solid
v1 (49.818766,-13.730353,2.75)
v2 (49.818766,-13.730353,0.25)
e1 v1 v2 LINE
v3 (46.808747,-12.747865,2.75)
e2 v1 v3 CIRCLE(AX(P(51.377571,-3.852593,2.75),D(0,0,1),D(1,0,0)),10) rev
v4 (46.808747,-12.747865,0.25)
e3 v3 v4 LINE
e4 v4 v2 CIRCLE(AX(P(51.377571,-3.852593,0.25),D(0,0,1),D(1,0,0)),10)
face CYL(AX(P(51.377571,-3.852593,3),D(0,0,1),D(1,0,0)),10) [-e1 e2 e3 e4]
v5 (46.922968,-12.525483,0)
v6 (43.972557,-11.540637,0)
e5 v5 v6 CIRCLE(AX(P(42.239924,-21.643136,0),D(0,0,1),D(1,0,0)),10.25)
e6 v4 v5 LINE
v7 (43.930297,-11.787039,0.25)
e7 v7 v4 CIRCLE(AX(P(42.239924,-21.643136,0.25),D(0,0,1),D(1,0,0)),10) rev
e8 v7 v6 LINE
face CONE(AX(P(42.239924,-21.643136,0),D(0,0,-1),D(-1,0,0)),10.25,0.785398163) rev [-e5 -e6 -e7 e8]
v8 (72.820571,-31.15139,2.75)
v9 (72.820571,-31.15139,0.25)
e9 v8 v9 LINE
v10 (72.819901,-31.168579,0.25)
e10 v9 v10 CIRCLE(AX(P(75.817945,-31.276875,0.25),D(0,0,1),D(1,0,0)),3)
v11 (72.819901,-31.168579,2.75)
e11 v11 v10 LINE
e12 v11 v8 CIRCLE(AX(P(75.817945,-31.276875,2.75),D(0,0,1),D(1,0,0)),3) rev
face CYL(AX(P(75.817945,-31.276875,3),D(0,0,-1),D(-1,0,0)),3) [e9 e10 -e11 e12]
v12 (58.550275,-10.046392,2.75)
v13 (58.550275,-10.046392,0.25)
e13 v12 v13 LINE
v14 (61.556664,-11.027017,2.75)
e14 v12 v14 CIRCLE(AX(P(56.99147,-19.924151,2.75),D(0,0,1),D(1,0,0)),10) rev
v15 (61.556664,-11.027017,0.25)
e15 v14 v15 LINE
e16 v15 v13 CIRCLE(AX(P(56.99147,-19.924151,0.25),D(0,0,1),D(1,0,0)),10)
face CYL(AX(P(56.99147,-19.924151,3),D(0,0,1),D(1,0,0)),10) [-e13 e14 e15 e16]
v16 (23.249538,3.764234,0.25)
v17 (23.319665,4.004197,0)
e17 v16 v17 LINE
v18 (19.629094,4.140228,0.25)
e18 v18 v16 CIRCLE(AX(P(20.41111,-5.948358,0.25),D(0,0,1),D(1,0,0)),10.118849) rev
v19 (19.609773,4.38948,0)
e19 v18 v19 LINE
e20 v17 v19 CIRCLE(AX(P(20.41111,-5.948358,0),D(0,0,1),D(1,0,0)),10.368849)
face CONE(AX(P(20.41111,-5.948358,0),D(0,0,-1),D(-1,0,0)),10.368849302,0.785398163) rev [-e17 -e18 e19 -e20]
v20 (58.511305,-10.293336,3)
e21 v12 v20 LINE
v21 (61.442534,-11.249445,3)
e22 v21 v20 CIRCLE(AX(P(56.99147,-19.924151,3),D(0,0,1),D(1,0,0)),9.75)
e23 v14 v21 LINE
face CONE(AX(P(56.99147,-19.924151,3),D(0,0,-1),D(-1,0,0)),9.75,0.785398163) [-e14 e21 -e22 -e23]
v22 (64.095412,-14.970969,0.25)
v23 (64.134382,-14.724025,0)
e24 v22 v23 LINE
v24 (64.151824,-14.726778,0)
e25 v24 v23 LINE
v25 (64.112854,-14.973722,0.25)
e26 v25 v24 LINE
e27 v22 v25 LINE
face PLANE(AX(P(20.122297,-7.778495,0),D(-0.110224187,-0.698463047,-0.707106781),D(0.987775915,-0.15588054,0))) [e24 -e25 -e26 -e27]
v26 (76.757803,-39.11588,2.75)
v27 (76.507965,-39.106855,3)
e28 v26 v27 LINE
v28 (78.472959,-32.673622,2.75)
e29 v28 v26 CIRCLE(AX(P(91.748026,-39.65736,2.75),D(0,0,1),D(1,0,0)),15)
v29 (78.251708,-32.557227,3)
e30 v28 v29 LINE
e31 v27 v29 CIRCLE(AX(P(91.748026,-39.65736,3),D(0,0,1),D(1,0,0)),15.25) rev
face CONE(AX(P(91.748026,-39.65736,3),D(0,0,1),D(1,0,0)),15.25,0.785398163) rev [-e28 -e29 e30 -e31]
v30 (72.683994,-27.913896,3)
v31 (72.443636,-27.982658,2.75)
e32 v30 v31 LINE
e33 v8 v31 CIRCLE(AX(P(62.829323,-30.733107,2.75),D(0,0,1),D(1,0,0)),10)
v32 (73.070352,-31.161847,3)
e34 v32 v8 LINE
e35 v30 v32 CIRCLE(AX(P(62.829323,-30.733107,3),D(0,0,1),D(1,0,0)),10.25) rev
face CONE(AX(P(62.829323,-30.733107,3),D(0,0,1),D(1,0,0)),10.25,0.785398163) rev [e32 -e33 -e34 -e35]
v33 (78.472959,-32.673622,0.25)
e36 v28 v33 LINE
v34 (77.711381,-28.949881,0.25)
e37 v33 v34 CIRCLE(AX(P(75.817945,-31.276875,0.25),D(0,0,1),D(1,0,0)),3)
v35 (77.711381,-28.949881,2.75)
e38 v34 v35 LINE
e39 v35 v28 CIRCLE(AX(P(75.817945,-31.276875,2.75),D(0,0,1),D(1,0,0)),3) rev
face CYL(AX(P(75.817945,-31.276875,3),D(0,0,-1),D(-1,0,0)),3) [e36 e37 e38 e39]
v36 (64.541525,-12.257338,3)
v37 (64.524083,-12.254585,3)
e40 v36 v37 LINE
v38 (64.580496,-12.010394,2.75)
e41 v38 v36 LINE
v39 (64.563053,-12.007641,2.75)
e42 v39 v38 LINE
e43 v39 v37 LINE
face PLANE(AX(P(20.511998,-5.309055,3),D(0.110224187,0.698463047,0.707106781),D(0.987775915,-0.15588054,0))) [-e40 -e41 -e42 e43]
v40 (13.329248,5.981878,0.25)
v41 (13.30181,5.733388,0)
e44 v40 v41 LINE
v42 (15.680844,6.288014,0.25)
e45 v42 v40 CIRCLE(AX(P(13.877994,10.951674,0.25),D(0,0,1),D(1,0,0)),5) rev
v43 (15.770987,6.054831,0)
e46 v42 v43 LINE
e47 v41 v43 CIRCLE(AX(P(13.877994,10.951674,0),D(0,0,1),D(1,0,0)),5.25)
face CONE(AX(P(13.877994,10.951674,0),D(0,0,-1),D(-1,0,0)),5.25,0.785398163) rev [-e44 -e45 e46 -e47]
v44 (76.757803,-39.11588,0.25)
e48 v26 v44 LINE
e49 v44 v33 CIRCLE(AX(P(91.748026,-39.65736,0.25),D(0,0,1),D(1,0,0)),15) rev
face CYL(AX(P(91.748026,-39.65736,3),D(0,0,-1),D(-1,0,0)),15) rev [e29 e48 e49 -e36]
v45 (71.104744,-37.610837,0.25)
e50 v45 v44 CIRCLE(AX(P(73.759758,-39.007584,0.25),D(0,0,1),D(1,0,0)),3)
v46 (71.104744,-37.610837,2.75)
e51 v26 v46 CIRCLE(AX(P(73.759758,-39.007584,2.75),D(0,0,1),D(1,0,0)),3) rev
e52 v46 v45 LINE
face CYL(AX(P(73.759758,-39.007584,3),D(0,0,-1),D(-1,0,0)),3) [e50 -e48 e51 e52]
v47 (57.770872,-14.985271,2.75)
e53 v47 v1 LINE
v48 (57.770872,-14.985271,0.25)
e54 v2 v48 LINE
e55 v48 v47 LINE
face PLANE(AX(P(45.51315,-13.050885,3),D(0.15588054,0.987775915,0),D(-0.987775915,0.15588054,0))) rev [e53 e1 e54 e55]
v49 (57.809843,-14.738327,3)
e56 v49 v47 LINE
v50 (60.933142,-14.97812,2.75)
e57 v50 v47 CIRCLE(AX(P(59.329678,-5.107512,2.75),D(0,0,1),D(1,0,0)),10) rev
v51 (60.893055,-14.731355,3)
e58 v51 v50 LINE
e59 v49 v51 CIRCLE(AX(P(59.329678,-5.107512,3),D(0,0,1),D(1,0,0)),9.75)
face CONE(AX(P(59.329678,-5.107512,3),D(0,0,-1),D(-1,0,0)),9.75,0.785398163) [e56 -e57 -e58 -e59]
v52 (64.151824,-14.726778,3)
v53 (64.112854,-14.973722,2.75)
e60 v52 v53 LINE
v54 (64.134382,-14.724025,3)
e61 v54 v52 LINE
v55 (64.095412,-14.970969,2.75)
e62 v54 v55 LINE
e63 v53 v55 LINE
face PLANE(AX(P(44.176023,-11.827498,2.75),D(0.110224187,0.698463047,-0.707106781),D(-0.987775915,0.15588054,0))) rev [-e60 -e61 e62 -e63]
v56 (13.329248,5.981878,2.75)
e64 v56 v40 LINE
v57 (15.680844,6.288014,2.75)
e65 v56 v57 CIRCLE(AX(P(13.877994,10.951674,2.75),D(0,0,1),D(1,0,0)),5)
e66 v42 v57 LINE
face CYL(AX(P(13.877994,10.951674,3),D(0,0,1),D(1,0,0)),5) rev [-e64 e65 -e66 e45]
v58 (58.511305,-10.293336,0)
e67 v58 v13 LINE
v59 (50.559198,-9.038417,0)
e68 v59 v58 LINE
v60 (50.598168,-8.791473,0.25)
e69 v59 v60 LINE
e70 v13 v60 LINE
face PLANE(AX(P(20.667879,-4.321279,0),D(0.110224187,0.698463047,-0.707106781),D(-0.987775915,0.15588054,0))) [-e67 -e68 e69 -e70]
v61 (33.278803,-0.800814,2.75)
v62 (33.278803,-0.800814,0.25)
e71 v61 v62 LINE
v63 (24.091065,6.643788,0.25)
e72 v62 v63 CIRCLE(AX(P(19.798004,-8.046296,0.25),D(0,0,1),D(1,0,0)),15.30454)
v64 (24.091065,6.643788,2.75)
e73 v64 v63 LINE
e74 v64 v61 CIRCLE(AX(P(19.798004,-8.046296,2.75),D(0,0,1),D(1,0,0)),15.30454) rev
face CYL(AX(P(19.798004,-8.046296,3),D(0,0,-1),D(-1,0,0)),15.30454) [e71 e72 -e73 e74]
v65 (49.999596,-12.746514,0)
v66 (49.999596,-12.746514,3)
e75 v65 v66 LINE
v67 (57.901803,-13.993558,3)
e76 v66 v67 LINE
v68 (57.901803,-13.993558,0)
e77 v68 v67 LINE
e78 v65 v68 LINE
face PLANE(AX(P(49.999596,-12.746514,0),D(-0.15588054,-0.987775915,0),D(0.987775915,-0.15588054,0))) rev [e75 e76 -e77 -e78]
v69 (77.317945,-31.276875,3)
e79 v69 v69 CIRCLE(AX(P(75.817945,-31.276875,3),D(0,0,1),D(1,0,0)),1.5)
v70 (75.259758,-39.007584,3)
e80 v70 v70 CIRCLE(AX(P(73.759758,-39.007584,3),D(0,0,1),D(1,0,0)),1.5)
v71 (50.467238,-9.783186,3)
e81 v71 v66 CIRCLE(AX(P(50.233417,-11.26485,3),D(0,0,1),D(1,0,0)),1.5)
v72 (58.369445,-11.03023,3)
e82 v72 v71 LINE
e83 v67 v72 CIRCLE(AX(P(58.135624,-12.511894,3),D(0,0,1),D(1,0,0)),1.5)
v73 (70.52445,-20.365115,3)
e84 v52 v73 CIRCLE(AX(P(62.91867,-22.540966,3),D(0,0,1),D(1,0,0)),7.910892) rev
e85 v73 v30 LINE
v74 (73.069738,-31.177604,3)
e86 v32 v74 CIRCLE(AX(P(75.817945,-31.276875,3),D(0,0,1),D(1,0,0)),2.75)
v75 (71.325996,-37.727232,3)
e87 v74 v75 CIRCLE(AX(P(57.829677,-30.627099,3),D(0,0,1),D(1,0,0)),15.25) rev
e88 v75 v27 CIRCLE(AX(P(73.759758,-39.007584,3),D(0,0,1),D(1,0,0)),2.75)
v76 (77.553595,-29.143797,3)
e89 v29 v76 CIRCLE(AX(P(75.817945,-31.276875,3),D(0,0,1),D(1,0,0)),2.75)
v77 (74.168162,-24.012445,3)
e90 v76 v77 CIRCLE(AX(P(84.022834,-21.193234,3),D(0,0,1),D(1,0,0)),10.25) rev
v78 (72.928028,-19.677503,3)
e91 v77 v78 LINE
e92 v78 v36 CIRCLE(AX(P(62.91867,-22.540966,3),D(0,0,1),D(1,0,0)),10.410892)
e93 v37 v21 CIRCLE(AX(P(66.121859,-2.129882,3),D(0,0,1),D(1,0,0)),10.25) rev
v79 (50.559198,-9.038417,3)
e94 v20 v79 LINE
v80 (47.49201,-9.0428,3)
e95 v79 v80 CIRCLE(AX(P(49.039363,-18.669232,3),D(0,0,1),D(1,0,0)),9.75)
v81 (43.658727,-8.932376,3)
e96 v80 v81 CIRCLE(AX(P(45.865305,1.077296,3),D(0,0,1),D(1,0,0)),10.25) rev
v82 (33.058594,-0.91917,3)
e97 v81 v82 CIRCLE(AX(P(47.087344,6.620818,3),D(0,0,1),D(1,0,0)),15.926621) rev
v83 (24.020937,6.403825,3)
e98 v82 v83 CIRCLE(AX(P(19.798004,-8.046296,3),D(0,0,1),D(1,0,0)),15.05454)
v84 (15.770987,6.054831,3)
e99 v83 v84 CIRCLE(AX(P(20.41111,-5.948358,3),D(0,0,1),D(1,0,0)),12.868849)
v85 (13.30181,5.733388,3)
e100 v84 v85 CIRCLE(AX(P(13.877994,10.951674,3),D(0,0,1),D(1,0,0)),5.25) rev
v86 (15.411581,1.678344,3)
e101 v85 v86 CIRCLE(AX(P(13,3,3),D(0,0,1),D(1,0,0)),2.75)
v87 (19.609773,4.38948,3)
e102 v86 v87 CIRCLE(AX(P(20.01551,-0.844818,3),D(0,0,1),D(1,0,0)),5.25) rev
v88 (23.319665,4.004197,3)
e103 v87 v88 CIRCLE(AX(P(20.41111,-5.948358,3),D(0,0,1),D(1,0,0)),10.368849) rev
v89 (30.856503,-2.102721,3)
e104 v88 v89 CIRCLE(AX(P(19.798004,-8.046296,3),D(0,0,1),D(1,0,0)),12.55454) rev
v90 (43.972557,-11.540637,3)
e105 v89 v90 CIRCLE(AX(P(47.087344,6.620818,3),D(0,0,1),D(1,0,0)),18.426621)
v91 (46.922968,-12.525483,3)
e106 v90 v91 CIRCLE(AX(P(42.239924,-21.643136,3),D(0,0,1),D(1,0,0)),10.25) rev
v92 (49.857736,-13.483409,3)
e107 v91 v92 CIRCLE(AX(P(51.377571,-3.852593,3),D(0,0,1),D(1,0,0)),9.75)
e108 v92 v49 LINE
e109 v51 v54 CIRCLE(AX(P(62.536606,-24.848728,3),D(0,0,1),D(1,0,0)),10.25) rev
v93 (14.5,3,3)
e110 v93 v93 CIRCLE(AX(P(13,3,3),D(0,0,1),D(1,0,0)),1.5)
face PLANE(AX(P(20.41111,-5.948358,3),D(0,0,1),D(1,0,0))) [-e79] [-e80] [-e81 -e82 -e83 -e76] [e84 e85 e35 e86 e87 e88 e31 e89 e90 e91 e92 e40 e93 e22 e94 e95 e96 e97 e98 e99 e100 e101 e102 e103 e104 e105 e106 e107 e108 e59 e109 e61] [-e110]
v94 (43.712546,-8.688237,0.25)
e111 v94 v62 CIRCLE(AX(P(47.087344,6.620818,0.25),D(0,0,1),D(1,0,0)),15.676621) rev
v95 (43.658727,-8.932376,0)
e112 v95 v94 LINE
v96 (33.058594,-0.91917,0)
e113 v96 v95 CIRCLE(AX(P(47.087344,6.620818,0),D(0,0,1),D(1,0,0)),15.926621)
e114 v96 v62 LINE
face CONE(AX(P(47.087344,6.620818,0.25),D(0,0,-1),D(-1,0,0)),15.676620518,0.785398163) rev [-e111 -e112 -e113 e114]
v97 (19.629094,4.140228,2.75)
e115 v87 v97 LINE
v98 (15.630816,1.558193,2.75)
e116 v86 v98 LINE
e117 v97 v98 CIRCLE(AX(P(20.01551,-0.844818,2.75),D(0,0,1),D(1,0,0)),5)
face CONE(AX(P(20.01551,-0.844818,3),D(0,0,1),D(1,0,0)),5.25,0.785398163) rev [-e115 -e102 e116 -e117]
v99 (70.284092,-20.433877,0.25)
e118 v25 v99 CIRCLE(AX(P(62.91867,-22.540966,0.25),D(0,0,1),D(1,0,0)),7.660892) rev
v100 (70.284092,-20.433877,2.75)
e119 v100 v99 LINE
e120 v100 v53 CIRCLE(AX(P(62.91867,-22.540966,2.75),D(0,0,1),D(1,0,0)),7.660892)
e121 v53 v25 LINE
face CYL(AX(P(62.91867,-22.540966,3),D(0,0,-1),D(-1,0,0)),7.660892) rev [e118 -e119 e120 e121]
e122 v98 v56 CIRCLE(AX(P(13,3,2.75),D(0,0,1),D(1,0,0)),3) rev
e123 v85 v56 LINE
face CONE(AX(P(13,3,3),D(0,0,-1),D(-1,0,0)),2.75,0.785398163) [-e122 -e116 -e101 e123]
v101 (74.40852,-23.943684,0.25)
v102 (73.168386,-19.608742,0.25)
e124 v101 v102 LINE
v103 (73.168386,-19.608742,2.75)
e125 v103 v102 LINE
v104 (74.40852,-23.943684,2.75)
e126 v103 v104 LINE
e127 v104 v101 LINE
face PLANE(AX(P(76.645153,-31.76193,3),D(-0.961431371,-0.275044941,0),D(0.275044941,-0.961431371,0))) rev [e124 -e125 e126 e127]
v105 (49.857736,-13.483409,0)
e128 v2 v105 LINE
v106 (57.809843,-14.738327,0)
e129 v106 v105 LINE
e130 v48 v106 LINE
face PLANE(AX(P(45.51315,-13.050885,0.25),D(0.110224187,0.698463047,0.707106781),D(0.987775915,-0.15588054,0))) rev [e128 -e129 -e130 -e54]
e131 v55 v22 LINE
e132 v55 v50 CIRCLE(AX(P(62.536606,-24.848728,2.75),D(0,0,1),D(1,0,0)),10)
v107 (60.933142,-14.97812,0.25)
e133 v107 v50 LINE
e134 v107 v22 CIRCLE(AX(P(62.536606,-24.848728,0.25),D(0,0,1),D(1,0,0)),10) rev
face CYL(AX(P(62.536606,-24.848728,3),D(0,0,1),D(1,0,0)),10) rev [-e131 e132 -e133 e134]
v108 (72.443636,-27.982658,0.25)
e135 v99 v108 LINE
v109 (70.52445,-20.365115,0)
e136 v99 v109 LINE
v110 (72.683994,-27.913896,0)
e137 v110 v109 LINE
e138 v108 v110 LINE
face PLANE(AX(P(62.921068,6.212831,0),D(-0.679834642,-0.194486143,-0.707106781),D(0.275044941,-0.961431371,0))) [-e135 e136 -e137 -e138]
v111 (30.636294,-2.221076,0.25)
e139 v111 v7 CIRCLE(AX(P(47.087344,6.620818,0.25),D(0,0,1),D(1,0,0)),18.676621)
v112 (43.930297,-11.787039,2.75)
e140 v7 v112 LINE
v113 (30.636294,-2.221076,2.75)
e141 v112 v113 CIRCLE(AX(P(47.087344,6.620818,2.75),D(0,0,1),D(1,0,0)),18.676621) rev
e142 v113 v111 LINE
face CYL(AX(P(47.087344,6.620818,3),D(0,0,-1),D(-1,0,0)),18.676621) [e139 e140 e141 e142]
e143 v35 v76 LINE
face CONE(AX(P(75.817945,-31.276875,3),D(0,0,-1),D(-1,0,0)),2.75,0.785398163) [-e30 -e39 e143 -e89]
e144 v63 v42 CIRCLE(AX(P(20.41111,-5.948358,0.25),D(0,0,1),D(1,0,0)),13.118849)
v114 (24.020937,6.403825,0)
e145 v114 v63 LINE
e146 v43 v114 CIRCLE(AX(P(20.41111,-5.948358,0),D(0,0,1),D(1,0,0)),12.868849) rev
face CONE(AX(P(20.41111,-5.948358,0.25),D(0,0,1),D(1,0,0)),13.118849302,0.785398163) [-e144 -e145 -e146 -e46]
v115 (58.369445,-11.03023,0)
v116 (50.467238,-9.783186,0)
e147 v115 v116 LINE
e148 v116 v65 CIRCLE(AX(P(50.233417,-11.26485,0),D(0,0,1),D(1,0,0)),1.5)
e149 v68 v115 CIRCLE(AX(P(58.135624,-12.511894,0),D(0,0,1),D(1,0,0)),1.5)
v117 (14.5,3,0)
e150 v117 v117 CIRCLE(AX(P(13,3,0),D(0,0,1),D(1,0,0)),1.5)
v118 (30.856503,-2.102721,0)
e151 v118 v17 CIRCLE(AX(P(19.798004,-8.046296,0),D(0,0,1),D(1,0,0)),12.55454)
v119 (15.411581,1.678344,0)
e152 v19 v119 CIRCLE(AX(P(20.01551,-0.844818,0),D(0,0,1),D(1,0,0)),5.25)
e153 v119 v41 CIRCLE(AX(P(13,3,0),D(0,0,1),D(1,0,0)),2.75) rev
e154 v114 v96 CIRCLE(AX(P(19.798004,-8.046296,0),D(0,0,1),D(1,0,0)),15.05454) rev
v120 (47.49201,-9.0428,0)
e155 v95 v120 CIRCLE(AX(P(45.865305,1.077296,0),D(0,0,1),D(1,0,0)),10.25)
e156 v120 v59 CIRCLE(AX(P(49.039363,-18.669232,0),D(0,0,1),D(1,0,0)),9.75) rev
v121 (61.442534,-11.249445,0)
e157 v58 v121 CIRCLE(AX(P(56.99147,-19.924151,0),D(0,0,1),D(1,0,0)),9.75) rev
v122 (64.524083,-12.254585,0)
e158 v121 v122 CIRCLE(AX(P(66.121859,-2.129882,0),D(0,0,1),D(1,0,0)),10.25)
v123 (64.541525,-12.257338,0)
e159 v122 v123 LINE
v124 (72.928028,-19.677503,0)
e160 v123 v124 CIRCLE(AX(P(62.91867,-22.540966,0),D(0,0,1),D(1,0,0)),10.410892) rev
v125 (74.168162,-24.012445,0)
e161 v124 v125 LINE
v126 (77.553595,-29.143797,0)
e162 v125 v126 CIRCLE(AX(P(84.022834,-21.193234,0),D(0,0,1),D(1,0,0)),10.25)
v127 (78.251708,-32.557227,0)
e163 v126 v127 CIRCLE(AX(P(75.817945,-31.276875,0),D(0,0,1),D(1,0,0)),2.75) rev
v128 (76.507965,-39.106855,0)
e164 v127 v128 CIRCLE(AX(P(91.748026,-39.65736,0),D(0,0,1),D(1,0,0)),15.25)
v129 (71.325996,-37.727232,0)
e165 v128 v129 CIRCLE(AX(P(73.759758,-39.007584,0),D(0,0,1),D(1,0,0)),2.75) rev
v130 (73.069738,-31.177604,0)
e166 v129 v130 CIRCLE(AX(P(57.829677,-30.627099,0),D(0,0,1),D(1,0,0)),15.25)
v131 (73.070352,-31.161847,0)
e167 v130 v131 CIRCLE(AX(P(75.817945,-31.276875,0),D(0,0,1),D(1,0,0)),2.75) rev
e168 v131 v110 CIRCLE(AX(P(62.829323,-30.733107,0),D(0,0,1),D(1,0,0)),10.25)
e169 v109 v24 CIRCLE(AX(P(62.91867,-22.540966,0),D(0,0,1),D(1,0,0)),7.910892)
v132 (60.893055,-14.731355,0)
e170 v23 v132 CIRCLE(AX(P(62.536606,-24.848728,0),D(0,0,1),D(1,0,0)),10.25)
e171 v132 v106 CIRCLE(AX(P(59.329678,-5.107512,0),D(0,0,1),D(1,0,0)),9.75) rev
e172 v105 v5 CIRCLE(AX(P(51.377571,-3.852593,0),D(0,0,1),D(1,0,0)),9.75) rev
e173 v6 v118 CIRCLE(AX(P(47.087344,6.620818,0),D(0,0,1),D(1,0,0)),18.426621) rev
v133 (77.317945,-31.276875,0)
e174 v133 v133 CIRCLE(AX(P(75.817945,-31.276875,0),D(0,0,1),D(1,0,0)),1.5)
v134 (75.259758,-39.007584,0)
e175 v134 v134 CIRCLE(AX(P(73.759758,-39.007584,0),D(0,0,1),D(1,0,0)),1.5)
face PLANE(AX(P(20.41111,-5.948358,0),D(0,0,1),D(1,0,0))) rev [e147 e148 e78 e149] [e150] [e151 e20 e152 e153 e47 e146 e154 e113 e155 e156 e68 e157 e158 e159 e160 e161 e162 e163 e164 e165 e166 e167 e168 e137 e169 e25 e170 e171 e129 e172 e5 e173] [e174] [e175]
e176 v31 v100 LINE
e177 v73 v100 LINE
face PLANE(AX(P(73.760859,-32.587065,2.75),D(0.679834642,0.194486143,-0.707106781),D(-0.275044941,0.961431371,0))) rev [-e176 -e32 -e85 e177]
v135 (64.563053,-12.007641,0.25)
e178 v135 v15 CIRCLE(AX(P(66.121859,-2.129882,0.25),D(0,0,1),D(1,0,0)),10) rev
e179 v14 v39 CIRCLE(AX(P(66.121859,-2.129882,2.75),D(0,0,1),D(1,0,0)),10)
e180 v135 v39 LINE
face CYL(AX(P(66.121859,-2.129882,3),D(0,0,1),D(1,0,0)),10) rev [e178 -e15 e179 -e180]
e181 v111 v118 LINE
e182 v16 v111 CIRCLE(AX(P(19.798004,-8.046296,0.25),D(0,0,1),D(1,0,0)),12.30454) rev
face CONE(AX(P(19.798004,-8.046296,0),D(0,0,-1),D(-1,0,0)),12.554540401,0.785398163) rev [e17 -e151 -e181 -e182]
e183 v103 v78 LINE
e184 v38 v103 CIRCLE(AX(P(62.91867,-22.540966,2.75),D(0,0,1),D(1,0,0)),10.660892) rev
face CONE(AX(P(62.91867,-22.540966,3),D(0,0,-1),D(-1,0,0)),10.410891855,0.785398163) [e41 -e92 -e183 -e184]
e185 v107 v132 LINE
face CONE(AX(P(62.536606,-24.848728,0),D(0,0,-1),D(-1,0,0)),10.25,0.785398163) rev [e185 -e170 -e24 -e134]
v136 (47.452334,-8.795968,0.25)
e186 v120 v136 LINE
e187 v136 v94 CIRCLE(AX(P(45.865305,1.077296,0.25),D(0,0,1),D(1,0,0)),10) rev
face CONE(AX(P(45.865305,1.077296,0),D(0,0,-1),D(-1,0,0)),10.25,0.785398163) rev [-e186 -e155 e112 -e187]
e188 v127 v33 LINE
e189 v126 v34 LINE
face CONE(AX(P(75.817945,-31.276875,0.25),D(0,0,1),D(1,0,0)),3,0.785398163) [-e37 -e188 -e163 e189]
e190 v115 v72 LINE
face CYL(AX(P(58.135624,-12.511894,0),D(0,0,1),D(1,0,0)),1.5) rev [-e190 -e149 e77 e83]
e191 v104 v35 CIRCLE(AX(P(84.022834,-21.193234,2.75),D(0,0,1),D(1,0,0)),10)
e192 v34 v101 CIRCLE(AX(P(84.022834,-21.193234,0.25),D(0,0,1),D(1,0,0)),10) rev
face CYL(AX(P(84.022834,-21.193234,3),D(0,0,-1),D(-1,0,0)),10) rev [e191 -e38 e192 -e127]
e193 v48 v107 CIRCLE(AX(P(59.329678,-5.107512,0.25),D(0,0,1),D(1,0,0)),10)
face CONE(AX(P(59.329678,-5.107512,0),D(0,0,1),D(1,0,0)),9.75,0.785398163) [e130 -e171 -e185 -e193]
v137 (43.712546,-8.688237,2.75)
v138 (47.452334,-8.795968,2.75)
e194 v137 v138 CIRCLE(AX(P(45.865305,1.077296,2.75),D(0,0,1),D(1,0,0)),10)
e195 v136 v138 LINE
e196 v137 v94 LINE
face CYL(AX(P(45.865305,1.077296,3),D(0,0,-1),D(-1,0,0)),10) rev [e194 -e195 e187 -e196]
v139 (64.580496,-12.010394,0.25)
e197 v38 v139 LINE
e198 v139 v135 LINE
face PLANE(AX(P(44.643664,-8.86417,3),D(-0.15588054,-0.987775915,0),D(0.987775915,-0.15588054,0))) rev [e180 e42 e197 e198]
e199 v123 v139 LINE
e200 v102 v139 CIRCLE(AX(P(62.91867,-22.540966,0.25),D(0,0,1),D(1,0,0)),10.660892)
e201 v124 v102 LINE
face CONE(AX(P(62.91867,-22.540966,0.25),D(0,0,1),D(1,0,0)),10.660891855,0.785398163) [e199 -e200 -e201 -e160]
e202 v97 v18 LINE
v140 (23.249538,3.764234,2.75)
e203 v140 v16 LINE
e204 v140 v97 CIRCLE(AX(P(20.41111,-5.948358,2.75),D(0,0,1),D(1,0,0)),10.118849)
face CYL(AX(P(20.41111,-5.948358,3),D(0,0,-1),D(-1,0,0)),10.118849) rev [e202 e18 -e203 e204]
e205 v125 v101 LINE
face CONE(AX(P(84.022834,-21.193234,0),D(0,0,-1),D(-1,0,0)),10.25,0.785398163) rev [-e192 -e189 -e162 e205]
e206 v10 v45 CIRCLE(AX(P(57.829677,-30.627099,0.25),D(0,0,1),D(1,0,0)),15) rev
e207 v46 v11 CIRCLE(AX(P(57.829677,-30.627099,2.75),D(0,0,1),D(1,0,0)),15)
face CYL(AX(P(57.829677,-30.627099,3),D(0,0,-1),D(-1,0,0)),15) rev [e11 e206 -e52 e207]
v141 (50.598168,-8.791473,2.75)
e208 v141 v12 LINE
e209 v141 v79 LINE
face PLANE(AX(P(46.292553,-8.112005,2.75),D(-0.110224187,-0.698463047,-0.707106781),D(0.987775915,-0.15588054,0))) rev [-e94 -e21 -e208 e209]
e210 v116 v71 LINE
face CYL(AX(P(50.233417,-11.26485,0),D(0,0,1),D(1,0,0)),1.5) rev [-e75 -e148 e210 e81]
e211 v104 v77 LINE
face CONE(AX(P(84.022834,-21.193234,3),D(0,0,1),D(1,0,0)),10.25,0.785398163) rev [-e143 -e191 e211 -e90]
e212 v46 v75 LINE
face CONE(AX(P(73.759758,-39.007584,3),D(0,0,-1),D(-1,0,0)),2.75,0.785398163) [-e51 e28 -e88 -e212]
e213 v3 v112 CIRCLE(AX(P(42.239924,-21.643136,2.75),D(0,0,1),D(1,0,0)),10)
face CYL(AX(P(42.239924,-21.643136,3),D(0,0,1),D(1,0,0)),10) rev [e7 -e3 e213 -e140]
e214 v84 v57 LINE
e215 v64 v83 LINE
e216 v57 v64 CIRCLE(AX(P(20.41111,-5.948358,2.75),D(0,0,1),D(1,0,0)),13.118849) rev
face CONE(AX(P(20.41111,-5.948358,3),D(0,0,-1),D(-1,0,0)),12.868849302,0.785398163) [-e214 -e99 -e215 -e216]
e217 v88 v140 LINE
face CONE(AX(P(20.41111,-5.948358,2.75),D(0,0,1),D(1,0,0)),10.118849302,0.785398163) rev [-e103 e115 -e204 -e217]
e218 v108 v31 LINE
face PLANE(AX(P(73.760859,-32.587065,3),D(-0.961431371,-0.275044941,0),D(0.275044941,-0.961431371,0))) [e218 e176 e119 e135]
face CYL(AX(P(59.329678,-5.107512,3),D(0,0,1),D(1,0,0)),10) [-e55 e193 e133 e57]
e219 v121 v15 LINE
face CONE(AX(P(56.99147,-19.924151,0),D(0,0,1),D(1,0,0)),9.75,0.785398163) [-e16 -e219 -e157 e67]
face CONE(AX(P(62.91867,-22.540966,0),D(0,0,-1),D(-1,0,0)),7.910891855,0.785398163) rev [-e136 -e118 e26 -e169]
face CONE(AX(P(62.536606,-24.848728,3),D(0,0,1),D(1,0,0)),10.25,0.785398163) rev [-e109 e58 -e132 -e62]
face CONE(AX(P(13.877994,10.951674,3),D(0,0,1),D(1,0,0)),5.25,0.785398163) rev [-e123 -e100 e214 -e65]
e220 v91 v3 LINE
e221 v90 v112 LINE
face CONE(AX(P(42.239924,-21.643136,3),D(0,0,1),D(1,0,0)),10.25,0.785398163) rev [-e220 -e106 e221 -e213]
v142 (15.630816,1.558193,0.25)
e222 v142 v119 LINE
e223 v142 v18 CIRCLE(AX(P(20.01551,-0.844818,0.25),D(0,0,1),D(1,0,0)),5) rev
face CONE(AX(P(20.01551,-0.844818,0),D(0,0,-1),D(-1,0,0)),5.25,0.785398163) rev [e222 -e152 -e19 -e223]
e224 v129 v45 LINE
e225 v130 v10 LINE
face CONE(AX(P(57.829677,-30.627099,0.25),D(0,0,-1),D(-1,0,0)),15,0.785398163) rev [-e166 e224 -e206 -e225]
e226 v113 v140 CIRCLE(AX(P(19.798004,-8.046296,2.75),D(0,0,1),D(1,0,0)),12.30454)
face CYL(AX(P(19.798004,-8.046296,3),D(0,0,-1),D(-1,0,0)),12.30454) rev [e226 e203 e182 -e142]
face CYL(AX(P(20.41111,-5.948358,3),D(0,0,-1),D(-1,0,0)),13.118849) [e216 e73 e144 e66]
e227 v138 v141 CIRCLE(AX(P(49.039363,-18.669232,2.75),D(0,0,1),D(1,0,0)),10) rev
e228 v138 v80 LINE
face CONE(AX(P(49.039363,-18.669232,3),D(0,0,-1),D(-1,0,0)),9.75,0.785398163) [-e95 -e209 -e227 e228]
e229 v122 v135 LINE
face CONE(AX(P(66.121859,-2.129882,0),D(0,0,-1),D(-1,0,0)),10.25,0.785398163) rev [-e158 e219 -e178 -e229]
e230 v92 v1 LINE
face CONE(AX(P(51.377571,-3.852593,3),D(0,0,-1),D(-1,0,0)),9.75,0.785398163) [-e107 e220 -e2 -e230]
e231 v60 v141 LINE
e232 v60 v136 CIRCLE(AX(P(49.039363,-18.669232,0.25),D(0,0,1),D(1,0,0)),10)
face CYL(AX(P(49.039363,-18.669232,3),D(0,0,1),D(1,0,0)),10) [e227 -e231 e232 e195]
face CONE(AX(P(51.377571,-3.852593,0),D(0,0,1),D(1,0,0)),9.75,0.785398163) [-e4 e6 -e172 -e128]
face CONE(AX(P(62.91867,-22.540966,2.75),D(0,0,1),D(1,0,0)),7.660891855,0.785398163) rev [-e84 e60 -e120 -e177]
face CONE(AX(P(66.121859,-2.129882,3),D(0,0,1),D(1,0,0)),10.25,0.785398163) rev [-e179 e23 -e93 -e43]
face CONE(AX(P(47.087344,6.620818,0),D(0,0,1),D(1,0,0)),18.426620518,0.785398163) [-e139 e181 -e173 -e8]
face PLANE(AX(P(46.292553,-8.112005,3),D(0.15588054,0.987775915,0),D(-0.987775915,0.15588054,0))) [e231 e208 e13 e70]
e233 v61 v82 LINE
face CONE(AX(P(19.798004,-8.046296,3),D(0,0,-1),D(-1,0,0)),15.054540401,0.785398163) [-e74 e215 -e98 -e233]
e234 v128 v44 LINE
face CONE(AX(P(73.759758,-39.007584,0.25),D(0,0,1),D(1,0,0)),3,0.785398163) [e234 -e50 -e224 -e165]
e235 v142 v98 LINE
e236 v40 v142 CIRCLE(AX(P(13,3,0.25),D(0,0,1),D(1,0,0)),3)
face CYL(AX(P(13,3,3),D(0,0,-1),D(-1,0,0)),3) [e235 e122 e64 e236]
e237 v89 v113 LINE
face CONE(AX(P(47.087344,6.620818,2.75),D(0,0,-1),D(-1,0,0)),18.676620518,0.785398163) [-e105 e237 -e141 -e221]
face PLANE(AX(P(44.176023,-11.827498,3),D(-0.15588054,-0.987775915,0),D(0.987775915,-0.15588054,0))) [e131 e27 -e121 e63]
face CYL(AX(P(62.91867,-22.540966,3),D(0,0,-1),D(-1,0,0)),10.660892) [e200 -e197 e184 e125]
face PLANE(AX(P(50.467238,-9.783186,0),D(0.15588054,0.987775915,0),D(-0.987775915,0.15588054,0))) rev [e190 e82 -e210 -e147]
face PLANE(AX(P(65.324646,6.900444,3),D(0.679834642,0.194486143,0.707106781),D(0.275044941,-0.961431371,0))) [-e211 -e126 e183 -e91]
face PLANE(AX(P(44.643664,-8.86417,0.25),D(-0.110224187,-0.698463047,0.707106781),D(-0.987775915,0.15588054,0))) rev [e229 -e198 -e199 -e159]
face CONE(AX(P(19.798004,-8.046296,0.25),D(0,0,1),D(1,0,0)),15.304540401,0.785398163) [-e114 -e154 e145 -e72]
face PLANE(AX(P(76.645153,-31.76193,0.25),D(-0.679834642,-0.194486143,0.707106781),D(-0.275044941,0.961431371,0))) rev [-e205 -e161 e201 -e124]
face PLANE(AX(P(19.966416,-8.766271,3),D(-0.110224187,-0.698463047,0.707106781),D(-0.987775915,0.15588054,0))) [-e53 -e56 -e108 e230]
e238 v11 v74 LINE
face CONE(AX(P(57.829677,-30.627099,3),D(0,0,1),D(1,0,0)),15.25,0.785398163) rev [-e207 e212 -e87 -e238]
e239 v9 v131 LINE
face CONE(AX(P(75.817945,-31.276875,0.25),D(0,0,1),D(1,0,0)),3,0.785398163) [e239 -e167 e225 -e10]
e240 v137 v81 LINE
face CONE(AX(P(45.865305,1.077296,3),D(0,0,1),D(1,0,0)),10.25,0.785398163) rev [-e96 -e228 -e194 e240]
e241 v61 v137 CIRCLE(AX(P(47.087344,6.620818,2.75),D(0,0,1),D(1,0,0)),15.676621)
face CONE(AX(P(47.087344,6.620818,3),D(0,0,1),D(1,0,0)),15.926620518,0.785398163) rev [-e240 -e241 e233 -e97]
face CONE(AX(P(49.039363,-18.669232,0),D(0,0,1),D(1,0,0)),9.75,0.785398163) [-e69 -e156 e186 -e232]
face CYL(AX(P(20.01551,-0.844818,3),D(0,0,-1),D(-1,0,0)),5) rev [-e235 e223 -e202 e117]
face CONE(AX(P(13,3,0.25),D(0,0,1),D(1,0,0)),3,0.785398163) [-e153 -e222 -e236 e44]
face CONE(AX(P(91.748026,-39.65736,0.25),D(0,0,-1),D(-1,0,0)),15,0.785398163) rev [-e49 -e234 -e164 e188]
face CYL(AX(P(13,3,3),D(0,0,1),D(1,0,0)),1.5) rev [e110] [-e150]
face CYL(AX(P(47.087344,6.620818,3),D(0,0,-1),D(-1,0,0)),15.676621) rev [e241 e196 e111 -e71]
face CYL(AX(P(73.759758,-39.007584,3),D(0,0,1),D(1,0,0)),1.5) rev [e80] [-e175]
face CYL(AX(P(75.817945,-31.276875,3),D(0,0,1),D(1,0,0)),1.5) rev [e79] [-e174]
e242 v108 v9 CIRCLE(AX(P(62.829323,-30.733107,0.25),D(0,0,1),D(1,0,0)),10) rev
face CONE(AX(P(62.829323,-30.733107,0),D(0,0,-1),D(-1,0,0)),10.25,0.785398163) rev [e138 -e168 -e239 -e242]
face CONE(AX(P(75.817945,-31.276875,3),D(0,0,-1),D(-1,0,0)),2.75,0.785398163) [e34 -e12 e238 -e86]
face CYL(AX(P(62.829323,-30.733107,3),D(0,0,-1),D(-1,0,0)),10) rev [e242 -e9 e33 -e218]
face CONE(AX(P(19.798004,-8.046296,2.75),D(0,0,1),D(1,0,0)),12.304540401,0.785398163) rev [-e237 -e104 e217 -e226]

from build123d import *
from OCP.BRepFilletAPI import BRepFilletAPI_MakeFillet

# Parameters (mm, degrees)
EXTRUDE_THIN1_DEPTH     = 3
SKETCH1_6_R             = 3
BOSS_EXTRUDE2_DEPTH     = 3
FILLET1_R               = 10
FILLET2_R               = 10
FILLET3_R1              = 10
FILLET3_R2              = 5
CHAMFER1_SIZE           = 0.25
CUT_EXTRUDE1_DEPTH      = 90.36389433
F_3_0_MM_DOWEL_HOLES1_D = 3


with BuildPart() as part:
    # Sketch1 → Extrude-Thin1 (new body)
    with BuildSketch(Plane.XY):
        with BuildLine():
            ThreePointArc((13.956778483, 1.844761957), (18.364214045, 3.961300509), (23.249537827, 3.764233943))
            ThreePointArc((23.249537827, 3.764233943), (27.544341573, 1.513827454), (30.636293504, -2.221075738))
            ThreePointArc((30.636293504, -2.221075738), (36.280115015, -8.611383188), (44.176022564, -11.827498007))
            Line((44.176022564, -11.827498007), (64.112853909, -14.973721748))
            ThreePointArc((64.112853909, -14.973721748), (67.995089498, -16.803438115), (70.284091708, -20.433876661))
            Line((70.284091708, -20.433876661), (73.760858733, -32.587064718))
            Line((73.760858733, -32.587064718), (76.645152845, -31.761929896))
            Line((76.645152845, -31.761929896), (73.168385821, -19.60874184))
            ThreePointArc((73.168385821, -19.60874184), (69.983011914, -14.556626047), (64.580495529, -12.010394005))
            Line((64.580495529, -12.010394005), (44.643664184, -8.864170263))
            ThreePointArc((44.643664184, -8.864170263), (38.016065461, -6.164655567), (33.278803277, -0.80081446))
            ThreePointArc((33.278803277, -0.80081446), (29.432995007, 3.844704587), (24.091064686, 6.64378817))
            ThreePointArc((24.091064686, 6.64378817), (17.757357703, 6.899280322), (12.043221517, 4.155238043))
            Line((12.043221517, 4.155238043), (13.956778483, 1.844761957))
        make_face()
    extrude(amount=EXTRUDE_THIN1_DEPTH)

    # Sketch1<6> → Boss-Extrude2 (add)
    with BuildSketch(Plane.XY):
        with BuildLine():
            ThreePointArc((78.472958706, -32.673622319), (75.046124973, -34.175890794), (72.819900547, -31.168578904))
            ThreePointArc((72.819900547, -31.168578904), (72.324756821, -34.48620054), (71.104744395, -37.610836569))
            ThreePointArc((71.104744395, -37.610836569), (74.47911855, -36.0951074), (76.759757859, -39.007584043))
            ThreePointArc((76.759757859, -39.007584043), (76.759268993, -39.061740839), (76.757802553, -39.115879984))
            ThreePointArc((76.757802553, -39.115879984), (77.252946279, -35.798258348), (78.472958706, -32.673622319))
        make_face()
        with BuildLine():
            ThreePointArc((78.817945242, -31.276874845), (77.878853444, -29.096815814), (75.649506987, -28.281607152))
            Line((75.649506987, -28.281607152), (76.645152845, -31.761929896))
            Line((76.645152845, -31.761929896), (75.203005789, -32.174497307))
            Line((75.203005789, -32.174497307), (73.760858733, -32.587064718))
            Line((73.760858733, -32.587064718), (73.053014062, -30.112763351))
            ThreePointArc((73.053014062, -30.112763351), (72.888498306, -30.63008226), (72.819900547, -31.168578904))
            ThreePointArc((72.819900547, -31.168578904), (75.046124973, -34.175890794), (78.472958706, -32.673622319))
            ThreePointArc((78.472958706, -32.673622319), (78.730421885, -31.996235537), (78.817945242, -31.276874845))
        make_face()
        with Locations((73.759757859, -39.007584043)):
            Circle(SKETCH1_6_R)
        with Locations((13, 3)):
            Circle(SKETCH1_6_R)
        Polygon((46.29255307, -8.112005426), (62.855890569, -10.725859392), (62.07648787, -15.664738964), (45.51315037, -13.050884998), align=None)
    extrude(amount=BOSS_EXTRUDE2_DEPTH)

    # Fillet1
    # the kernel refuses this fillet: 10 mm, written as the material it takes off along each edge
    with BuildSketch(Plane(origin=(45.51315037, -13.050884998, -10.897247359), x_dir=(0.9877759145103069, -0.1558805398801499, 0), z_dir=(0, 0, 1)), Plane(origin=(62.855890569, -10.725859392, -10.897247359), x_dir=(-0.9877759145103069, 0.15588053988014952, 0), z_dir=(0, 0, 1))) as fillet1_piece_1:
        with BuildLine():
            CenterArc((4.358898944, 10), FILLET1_R, 244.158067237, 25.841932763)
            Line((0, 1), (-0.087177979, 0.82))
            ThreePointArc((-0.087177979, 0.82), (-0.2, 0.5), (-0.2, 0))
            Line((-0.2, 0), (0, -0.2))
            Line((0, -0.2), (4.358898944, -0.2))
            Line((4.358898944, -0.2), (4.358898944, 0))
        make_face()
    extrude(amount=24.794494718, mode=Mode.SUBTRACT)
    with BuildSketch(Plane(origin=(62.07648787, -15.664738964, -10.897247359), x_dir=(0.1558805398801516, 0.9877759145103067, 0), z_dir=(0, 0, 1)), Plane(origin=(46.29255307, -8.112005426, -10.897247359), x_dir=(-0.1558805398801516, -0.9877759145103067, 0), z_dir=(0, 0, 1))) as fillet1_piece_2:
        with BuildLine():
            CenterArc((10, 4.358898944), FILLET1_R, 180, 25.841932763)
            Line((0, 4.358898944), (-0.2, 4.358898944))
            Line((-0.2, 4.358898944), (-0.2, 0))
            Line((-0.2, 0), (0, -0.2))
            ThreePointArc((0, -0.2), (0.5, -0.2), (0.82, -0.087177979))
            Line((0.82, -0.087177979), (1, 0))
        make_face()
    extrude(amount=24.794494718, mode=Mode.SUBTRACT)

    # Fillet2
    fillet2_edges = [part.edges().sort_by_distance(p)[0] for p in [
        (62.23236841, -14.67696305, 1.5),
        (62.70001003, -11.713635306, 1.5),
        (45.66903091, -12.063109084, 1.5),
        (46.13667253, -9.09978134, 1.5),
    ]]
    fillet(fillet2_edges, radius=FILLET2_R)

    # Fillet3: one fillet with a radius per group of edges: ONE call of the kernel's fillet builder (fillet() takes one radius for all edges)
    fillet3_edges_1 = [part.edges().sort_by_distance(p)[0] for p in [
        (73.053014062, -30.112763351, 1.5),
        (75.649506987, -28.281607152, 1.5),
    ]]
    fillet3_edges_2 = [part.edges().sort_by_distance(p)[0] for p in [
        (14.342872483, 5.682665371, 1.5),
        (15.99591873, 3.156431979, 1.5),
    ]]
    fillet3 = BRepFilletAPI_MakeFillet(part.part.solid().wrapped)
    for e in fillet3_edges_1:
        fillet3.Add(FILLET3_R1, e.wrapped)
    for e in fillet3_edges_2:
        fillet3.Add(FILLET3_R2, e.wrapped)
    add(Compound.cast(fillet3.Shape()), mode=Mode.REPLACE)

    # Chamfer1
    chamfer1_edges = [part.edges().sort_by_distance(p)[0] for p in [
        (54.57422182, -9.418932409, 0),
        (60.092477637, -10.417114134, 0),
        (48.27462413, -13.358997517, 0),
        (54.57422182, -9.418932409, 3),
        (49.025073316, -8.669242301, 3),
        (59.352291729, -15.107486729, 3),
        (29.432995007, 3.844704587, 0),
        (48.27462413, -13.358997517, 3),
        (64.571774389, -12.009017725, 0),
        (36.178802299, -8.53899299, 0),
        (36.178802299, -8.53899299, 3),
        (37.633792223, -5.884652293, 0),
        (37.633792223, -5.884652293, 3),
        (21.456361373, 4.116360797, 3),
        (69.983011914, -14.556626047, 0),
        (49.025073316, -8.669242301, 0),
        (59.352291729, -15.107486729, 0),
        (60.092477637, -10.417114134, 3),
        (45.406180886, -12.157630236, 0),
        (45.406180886, -12.157630236, 3),
        (45.57735687, -8.918557885, 0),
        (45.57735687, -8.918557885, 3),
        (62.513992379, -14.848753903, 0),
        (67.995089498, -16.803438115, 0),
        (62.513992379, -14.848753903, 3),
        (63.02085079, -11.636919182, 0),
        (63.02085079, -11.636919182, 3),
        (64.104132769, -14.972345468, 0),
        (27.544341573, 1.513827454, 0),
        (21.456361373, 4.116360797, 0),
        (10.338658069, 1.615348734, 3),
        (19.856644471, 7.158769061, 0),
        (10.338658069, 1.615348734, 0),
        (73.788452871, -21.776212775, 0),
        (73.788452871, -21.776212775, 3),
        (71.36386404, -24.208267097, 0),
        (71.36386404, -24.208267097, 3),
        (72.820223354, -31.159983943, 0),
        (72.820223354, -31.159983943, 3),
        (17.30302071, 3.35546819, 0),
        (27.544341573, 1.513827454, 3),
        (17.30302071, 3.35546819, 3),
        (14.523458256, 5.993511964, 0),
        (14.523458256, 5.993511964, 3),
        (75.675797588, -26.700228887, 3),
        (75.675797588, -26.700228887, 0),
        (72.759314108, -29.551891496, 3),
        (72.759314108, -29.551891496, 0),
        (64.104132769, -14.972345468, 3),
        (67.995089498, -16.803438115, 3),
        (78.757105023, -30.675759401, 0),
        (77.252946279, -35.798258348, 0),
        (72.324756821, -34.48620054, 0),
        (72.987937591, -41.906599992, 0),
        (72.324756821, -34.48620054, 3),
        (72.987937591, -41.906599992, 3),
        (77.252946279, -35.798258348, 3),
        (78.757105023, -30.675759401, 3),
        (69.983011914, -14.556626047, 3),
        (64.571774389, -12.009017725, 3),
        (19.856644471, 7.158769061, 3),
        (29.432995007, 3.844704587, 3),
        (53.79481912, -14.357811981, 0),
        (53.79481912, -14.357811981, 3),
    ]]
    chamfer(chamfer1_edges, length=CHAMFER1_SIZE)

    # Sketch2 → Cut-Extrude1 (cut, through all)
    with BuildSketch(Plane.XY.offset(3)):
        with BuildLine():
            Line((50.467237622, -9.783186164), (58.369444938, -11.030230483))
            ThreePointArc((58.369444938, -11.030230483), (59.617288, -12.745715164), (57.901803318, -13.993558226))
            Line((57.901803318, -13.993558226), (49.999596002, -12.746513907))
            ThreePointArc((49.999596002, -12.746513907), (48.75175294, -11.031029225), (50.467237622, -9.783186164))
        make_face()
    extrude(amount=-CUT_EXTRUDE1_DEPTH, mode=Mode.SUBTRACT)

    # Ø3.0 mm Dowel Holes1 (through all)
    with Locations(Plane.XY.offset(3)):
        with Locations((13, 3), (75.817945242, -31.276874845), (73.759757859, -39.007584043)):
            Hole(F_3_0_MM_DOWEL_HOLES1_D / 2)


solid = part.part
